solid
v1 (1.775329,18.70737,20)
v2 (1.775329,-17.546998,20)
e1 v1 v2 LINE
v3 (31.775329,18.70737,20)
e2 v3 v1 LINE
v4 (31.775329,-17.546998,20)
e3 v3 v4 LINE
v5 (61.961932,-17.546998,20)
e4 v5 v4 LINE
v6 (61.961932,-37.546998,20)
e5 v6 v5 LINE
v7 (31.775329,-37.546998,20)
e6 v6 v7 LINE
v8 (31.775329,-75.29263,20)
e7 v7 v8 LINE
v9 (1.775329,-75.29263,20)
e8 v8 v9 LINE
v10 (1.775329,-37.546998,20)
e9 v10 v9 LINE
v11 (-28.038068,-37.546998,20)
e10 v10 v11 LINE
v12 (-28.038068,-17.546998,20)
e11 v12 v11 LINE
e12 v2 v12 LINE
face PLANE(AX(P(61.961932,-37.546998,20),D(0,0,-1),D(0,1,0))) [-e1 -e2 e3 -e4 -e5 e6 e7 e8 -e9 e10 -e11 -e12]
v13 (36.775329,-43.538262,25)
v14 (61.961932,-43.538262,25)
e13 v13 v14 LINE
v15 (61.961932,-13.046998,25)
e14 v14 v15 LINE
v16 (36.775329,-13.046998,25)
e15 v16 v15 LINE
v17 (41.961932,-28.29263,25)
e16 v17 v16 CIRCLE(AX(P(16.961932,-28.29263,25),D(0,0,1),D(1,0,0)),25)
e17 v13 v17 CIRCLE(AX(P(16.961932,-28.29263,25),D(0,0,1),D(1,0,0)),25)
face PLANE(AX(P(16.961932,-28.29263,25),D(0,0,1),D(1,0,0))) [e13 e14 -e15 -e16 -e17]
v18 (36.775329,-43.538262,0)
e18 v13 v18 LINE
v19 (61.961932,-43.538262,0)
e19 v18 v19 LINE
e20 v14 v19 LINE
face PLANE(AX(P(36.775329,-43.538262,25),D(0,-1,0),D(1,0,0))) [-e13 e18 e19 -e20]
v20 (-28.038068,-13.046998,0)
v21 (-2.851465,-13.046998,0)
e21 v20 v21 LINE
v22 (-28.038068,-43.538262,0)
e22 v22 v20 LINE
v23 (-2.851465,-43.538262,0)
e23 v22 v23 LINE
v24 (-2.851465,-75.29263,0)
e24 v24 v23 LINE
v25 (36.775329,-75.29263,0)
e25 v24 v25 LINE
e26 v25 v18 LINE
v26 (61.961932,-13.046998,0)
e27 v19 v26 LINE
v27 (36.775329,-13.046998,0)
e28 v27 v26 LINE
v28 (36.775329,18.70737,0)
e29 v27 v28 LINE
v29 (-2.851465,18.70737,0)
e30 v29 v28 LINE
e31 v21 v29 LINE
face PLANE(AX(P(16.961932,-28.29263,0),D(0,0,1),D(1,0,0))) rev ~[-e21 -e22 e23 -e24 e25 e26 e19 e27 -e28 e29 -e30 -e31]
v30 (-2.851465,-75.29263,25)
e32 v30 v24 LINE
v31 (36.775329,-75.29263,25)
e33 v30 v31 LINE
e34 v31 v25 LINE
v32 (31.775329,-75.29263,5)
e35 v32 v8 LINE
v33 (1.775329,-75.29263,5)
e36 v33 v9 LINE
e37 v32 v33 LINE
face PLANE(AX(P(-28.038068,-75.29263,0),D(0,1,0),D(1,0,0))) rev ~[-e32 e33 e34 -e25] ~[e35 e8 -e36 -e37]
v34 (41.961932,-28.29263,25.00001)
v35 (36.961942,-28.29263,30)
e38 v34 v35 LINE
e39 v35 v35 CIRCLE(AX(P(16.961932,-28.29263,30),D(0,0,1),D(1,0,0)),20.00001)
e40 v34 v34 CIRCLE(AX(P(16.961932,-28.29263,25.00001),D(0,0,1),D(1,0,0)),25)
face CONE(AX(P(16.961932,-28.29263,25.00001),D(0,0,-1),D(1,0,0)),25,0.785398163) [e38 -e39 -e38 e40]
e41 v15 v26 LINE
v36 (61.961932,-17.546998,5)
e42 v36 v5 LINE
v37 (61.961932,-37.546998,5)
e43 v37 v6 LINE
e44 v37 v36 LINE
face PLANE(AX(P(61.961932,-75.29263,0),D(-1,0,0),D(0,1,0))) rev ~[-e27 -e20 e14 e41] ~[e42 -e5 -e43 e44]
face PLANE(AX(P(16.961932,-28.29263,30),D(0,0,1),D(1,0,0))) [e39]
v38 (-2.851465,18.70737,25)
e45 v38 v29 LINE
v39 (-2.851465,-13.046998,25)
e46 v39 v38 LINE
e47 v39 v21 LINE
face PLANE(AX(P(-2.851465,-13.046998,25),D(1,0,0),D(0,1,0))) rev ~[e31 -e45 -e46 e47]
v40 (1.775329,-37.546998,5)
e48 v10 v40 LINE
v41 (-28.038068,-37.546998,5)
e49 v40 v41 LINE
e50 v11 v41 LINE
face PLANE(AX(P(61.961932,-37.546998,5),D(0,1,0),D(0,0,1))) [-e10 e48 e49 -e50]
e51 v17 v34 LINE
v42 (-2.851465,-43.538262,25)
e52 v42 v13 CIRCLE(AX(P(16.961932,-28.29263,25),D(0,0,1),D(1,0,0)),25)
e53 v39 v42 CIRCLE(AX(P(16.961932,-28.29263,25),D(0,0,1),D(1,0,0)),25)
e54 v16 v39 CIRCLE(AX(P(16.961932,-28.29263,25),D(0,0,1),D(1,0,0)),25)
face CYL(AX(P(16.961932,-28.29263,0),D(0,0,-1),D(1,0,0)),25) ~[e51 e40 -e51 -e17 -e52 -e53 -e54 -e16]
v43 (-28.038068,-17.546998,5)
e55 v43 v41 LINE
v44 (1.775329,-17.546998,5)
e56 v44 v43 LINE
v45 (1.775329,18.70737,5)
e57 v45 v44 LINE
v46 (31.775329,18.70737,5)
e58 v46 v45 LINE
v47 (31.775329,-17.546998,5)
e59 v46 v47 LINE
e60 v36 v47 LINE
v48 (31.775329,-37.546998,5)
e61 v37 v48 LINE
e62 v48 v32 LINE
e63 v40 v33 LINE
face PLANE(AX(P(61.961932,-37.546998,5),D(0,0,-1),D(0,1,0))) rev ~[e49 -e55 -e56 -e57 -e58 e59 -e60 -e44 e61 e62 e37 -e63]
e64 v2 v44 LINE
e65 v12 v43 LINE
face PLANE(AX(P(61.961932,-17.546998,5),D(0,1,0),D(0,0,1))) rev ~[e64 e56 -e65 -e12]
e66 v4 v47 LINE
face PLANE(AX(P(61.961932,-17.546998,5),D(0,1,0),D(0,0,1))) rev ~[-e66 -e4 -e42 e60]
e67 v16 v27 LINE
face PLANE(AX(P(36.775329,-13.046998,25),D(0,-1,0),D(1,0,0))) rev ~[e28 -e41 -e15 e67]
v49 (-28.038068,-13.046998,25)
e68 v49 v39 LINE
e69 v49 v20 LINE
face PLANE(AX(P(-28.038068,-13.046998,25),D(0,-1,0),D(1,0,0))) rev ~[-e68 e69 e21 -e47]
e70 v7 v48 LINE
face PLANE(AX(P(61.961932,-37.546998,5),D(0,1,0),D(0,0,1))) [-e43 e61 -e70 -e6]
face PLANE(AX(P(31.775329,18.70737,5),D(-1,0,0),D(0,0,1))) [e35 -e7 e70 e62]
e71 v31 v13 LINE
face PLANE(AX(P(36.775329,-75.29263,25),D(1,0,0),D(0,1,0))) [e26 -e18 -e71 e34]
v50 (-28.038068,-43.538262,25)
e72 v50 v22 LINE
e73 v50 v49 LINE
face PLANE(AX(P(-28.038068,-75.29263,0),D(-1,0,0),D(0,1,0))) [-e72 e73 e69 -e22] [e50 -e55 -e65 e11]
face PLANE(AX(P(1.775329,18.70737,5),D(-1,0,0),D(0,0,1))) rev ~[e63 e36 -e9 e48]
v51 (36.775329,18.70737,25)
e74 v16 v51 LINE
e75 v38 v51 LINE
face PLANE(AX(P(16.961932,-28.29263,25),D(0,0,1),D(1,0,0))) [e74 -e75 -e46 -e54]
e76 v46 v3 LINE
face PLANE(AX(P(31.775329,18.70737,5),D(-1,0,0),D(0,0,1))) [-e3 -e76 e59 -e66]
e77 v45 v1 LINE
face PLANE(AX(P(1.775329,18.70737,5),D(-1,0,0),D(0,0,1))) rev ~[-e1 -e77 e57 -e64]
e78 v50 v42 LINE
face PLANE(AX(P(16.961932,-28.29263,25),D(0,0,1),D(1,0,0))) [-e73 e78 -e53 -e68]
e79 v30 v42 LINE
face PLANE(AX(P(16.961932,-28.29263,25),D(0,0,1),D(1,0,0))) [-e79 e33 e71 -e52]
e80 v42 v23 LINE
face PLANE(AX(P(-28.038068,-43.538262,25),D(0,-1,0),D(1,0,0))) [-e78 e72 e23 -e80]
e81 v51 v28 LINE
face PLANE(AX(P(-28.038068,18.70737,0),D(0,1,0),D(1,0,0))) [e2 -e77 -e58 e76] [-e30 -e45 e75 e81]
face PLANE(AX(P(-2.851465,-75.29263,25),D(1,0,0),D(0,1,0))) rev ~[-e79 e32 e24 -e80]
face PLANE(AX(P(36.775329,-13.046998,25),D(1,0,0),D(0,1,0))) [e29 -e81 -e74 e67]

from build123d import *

# Parameters (mm, degrees)
F0_R      = 25
F1_DEPTH  = 30
F0_W      = 90
F0_H      = 94
F2_DEPTH  = 25
F3_SIZE   = 4.99999
F4_W      = 25.1866029114
F4_H      = 31.7543679761
F5_DEPTH  = 100
F6_DEPTH  = 100
F7_W      = 30
F7_H      = 15
F8_DEPTH  = 1000
F9_W      = 20
F9_H      = 15
F10_DEPTH = 100


# Not quite as in the source:
# - a fillet or chamfer is up to 0.001 mm smaller than in the source, because OpenCascade refuses the exact size


with BuildPart() as f1:
    # F0 (on Top) → F1 (new body)
    with BuildSketch(Plane.XY):
        with Locations((16.9619322568, -28.2926298678)):
            Circle(F0_R)
    extrude(amount=F1_DEPTH)

    # F0 (on Top) → F2 (join)
    with BuildSketch(Plane.XY):
        with Locations((16.9619322568, -28.2926298678)):
            Rectangle(F0_W, F0_H)
        with Locations((16.9619322568, -28.2926298678)):
            Circle(F0_R, mode=Mode.SUBTRACT)
    extrude(amount=F2_DEPTH)

    # F3 (size 5 in the source; OpenCascade refuses exactly that, so slightly less here)
    f3_edges = [f1.edges().sort_by_distance(p)[0] for p in [
        (-8.038068, -28.29263, 30),
    ]]
    chamfer(f3_edges, length=F3_SIZE)

    # F4 (on face) → F5 (cut)
    with BuildSketch(Plane.XY.offset(25)):
        with Locations((49.3686308011, 2.8301861442)):
            Rectangle(F4_W, F4_H)
    extrude(amount=-F5_DEPTH, mode=Mode.SUBTRACT)

    # F4 (on face) → F6 (cut)
    with BuildSketch(Plane.XY.offset(25)):
        with Locations((-15.4447662875, 2.8301861442)):
            Rectangle(F4_W, F4_H)
        with Locations((-15.4447662875, -59.4154458798)):
            Rectangle(F4_W, F4_H)
        with Locations((49.3686308011, -59.4154458798)):
            Rectangle(F4_W, F4_H)
    extrude(amount=-F6_DEPTH, mode=Mode.SUBTRACT)

    # F7 (on face) → F8 (cut)
    with BuildSketch(Plane(origin=(0, 18.7073701322, 0), x_dir=(-1, 0, 0), z_dir=(0, 1, 0))):
        with Locations((-16.7753293454, 12.5)):
            Rectangle(F7_W, F7_H)
    extrude(amount=-F8_DEPTH, mode=Mode.SUBTRACT)

    # F9 (on face) → F10 (cut)
    with BuildSketch(Plane.YZ.offset(61.9619322568)):
        with Locations((-27.5469978439, 12.5)):
            Rectangle(F9_W, F9_H)
    extrude(amount=-F10_DEPTH, mode=Mode.SUBTRACT)


solid = f1.part
